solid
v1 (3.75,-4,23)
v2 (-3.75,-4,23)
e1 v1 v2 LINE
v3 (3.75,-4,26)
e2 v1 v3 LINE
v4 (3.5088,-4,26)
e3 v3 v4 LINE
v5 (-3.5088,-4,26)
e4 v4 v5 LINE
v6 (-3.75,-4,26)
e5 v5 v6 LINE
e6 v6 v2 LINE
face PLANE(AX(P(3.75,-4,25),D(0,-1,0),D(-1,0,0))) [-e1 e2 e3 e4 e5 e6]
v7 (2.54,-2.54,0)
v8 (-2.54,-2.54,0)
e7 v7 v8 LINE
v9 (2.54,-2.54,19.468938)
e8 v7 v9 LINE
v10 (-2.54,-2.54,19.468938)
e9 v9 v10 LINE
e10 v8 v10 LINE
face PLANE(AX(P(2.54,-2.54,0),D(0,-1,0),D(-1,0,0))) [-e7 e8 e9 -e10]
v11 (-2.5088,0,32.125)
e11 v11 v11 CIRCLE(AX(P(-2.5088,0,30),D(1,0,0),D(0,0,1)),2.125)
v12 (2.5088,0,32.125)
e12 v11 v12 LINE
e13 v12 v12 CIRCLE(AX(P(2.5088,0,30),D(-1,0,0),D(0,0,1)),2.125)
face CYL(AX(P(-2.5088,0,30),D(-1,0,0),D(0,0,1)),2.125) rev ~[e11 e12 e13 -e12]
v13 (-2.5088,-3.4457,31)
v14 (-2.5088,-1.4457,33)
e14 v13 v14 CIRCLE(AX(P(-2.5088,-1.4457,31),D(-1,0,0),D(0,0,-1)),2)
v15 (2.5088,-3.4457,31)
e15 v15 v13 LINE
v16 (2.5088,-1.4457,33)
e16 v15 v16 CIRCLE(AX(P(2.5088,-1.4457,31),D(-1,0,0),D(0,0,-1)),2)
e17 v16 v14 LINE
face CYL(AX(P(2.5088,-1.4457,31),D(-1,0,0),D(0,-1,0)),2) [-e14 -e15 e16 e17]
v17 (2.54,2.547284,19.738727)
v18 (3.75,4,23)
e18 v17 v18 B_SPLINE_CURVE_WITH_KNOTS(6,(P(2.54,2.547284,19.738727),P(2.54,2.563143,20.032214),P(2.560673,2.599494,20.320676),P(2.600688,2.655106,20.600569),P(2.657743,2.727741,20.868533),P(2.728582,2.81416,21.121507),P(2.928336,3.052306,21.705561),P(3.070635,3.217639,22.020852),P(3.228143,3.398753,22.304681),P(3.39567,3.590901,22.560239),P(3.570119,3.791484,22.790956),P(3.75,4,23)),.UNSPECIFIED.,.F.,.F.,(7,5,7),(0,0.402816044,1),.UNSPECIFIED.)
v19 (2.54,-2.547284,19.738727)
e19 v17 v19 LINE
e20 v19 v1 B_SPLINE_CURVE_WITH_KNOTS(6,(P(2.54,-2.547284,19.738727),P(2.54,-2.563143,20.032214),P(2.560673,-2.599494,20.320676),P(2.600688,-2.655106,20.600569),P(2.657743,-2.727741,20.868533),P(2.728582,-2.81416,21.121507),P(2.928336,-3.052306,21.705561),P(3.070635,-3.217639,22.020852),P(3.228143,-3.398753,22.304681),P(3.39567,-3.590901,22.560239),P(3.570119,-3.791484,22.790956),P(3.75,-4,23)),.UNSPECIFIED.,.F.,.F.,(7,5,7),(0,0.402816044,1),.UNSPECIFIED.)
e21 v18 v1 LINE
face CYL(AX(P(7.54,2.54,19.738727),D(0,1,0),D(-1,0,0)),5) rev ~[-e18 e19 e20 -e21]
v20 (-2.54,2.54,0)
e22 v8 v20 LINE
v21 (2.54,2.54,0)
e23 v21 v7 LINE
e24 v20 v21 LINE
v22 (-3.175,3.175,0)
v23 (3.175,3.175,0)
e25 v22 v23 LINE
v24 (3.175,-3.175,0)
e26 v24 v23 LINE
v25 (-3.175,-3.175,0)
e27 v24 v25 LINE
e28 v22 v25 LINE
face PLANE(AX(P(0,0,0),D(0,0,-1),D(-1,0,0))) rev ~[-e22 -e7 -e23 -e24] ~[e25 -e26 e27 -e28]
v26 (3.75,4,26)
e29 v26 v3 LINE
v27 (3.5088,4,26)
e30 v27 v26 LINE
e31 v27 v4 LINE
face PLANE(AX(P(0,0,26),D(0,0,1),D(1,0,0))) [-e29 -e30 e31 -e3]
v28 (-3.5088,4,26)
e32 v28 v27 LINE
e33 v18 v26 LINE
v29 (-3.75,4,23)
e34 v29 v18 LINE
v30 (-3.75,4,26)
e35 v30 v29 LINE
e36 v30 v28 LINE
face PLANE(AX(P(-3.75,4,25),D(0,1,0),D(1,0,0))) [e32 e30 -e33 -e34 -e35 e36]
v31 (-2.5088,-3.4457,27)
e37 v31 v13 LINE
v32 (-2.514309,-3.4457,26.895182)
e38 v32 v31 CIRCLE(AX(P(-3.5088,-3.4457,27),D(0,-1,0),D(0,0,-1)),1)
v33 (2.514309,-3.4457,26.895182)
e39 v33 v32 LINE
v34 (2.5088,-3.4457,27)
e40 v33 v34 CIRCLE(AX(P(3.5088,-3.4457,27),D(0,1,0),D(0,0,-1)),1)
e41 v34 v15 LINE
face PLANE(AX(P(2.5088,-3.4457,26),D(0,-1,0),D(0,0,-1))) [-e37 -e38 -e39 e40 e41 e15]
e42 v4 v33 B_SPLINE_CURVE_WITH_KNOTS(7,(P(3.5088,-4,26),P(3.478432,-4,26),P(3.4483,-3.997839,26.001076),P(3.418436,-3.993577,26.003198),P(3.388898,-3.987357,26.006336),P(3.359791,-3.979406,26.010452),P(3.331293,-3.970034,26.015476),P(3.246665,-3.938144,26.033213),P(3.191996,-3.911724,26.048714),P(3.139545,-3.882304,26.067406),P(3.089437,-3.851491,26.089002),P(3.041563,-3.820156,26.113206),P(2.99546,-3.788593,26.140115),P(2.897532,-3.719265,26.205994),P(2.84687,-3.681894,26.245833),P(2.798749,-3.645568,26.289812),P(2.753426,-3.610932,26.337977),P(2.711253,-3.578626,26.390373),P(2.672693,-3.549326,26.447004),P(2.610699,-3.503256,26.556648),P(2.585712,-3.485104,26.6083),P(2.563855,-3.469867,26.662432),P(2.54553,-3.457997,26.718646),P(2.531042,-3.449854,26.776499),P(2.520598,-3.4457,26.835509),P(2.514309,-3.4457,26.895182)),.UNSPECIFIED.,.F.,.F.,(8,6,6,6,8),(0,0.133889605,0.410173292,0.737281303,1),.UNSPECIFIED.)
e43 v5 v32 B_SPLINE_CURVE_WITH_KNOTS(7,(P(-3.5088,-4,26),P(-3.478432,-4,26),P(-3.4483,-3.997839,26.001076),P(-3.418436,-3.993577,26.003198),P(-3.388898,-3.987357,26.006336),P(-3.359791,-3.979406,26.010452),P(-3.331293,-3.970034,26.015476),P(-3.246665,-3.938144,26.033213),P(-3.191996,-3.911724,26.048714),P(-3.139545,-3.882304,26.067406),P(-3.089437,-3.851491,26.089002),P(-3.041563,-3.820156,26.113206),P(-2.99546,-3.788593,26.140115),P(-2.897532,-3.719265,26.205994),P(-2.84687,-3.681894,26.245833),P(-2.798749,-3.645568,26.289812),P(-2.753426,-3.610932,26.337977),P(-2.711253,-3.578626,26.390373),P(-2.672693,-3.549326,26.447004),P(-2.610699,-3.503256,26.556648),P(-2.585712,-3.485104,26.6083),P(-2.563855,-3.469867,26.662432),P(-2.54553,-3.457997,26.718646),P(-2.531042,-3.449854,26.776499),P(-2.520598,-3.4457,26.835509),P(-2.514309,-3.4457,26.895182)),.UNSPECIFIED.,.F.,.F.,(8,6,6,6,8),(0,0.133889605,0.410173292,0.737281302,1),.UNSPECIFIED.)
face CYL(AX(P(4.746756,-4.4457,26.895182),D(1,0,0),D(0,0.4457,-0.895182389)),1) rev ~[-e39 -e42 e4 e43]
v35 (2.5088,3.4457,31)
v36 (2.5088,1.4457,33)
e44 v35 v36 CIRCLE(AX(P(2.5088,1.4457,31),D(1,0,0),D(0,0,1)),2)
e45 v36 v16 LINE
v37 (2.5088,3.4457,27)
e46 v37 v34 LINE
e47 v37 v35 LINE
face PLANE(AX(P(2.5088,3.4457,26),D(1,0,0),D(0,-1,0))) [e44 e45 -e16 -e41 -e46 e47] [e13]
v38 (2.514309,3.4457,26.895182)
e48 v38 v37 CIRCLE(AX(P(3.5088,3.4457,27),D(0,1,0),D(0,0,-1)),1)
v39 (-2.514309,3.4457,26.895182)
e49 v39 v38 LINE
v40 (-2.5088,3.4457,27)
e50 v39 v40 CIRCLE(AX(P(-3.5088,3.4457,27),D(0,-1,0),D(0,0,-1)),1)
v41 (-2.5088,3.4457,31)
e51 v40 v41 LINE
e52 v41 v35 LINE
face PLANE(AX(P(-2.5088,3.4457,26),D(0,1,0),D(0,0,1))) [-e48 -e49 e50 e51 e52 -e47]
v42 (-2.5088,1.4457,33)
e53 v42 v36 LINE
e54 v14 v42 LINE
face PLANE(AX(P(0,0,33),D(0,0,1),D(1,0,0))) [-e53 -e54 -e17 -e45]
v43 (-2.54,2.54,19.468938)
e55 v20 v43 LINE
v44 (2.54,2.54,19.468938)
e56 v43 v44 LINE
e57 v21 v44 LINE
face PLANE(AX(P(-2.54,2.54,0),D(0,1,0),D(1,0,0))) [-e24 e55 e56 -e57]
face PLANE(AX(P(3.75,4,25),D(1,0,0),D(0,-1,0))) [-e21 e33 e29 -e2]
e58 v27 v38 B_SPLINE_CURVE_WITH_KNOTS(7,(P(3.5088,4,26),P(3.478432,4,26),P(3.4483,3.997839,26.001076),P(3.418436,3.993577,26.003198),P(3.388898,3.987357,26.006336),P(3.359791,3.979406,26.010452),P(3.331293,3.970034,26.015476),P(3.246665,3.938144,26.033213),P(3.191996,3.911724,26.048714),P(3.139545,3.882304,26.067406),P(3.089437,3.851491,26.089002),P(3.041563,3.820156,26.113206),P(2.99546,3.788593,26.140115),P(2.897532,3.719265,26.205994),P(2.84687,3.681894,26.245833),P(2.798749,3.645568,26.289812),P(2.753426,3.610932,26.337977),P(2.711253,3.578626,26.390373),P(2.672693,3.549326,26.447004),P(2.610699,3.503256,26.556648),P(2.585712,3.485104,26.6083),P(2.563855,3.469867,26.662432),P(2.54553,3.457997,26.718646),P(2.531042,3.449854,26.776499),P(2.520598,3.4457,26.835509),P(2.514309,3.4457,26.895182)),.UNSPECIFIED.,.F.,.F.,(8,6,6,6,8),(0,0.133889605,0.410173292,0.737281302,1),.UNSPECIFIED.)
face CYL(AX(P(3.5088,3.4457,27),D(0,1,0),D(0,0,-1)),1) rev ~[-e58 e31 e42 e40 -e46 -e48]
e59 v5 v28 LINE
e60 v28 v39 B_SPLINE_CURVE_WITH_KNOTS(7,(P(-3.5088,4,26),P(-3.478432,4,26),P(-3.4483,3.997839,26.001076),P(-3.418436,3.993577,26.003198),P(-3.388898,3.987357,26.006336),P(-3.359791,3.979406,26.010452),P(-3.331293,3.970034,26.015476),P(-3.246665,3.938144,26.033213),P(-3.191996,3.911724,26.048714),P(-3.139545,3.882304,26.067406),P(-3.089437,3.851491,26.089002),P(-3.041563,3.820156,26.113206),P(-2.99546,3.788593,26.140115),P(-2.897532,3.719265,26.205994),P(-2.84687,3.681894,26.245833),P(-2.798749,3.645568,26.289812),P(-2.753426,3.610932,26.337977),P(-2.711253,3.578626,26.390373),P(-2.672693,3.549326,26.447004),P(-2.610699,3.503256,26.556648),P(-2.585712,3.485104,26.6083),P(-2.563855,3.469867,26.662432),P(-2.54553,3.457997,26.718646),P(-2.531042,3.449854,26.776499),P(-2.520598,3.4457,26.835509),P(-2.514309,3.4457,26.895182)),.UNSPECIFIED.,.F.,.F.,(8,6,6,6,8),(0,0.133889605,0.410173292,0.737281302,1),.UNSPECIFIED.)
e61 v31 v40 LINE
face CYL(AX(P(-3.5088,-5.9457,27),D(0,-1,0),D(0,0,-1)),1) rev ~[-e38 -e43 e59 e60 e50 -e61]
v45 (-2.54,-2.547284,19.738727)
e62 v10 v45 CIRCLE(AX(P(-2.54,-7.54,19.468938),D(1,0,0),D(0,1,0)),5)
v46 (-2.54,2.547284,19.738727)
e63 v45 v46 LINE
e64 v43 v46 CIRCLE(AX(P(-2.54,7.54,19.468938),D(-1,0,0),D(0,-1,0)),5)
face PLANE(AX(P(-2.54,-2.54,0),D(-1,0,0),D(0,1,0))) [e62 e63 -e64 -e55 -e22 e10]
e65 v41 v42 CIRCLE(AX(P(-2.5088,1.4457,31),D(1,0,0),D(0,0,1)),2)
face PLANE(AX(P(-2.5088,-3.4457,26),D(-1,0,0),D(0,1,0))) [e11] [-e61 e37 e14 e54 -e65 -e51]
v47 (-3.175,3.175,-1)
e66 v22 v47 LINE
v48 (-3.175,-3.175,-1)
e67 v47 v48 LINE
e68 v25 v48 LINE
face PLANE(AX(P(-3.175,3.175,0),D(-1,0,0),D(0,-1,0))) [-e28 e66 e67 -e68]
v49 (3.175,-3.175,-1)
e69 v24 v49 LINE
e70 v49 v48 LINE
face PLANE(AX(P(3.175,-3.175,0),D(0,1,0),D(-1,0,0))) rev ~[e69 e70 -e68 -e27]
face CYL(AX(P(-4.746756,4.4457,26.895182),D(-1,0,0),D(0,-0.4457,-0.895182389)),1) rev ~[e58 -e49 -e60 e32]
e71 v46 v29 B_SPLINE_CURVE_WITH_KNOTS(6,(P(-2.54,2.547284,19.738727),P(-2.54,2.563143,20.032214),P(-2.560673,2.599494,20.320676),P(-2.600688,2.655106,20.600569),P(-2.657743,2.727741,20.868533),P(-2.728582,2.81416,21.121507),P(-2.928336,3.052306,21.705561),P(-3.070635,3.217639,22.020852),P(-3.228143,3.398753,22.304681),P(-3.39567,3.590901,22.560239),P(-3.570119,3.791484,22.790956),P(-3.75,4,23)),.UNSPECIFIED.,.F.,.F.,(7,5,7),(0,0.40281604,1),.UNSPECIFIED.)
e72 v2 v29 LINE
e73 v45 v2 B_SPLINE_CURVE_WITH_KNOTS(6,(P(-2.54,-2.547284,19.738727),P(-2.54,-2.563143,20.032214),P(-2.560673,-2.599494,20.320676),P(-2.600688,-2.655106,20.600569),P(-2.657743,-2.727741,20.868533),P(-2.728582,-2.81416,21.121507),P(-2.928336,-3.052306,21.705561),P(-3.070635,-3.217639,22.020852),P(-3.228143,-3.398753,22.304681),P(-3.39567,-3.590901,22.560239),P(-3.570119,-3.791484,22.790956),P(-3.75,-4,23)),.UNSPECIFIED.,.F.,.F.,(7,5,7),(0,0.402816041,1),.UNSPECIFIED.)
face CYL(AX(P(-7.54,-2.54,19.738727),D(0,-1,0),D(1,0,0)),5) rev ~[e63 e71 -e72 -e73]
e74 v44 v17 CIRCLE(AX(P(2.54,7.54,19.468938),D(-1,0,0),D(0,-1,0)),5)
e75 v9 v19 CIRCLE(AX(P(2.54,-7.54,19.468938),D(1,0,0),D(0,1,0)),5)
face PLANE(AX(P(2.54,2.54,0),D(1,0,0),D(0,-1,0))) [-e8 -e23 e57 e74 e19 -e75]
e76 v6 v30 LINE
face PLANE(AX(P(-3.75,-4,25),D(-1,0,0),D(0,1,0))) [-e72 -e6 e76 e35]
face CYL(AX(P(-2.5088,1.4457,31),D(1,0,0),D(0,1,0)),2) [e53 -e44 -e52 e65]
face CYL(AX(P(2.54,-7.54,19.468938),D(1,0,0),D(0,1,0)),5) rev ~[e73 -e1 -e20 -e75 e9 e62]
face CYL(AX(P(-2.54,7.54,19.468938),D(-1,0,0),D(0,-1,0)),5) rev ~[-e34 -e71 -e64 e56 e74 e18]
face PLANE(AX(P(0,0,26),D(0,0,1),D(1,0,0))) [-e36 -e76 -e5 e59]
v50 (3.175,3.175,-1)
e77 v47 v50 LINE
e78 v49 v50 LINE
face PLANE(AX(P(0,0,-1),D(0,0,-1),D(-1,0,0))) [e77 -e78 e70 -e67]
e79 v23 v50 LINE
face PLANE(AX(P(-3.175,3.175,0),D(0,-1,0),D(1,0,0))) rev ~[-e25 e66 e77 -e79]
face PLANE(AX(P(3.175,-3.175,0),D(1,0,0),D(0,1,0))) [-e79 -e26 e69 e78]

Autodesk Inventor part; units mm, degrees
ref_plane "YZ Plane" through (0, 0, 0) normal (1, 0, 0) x (0, 1, 0)
ref_plane "XZ Plane" through (0, 0, 0) normal (0, 1, 0) x (-1, 0, 0)
ref_plane "XY Plane" through (0, 0, 0) normal (0, 0, 1) x (1, 0, 0)
sketch "Sketch1" plane through (0, 0, 0) normal (0, 0, 1) x (1, 0, 0)
  line L0 (-3.175, -3.175) -> (-3.175, 3.175) projected
  line L1 (-3.175, 3.175) -> (3.175, 3.175) projected
  line L2 (3.175, 3.175) -> (3.175, -3.175) projected
  line L3 (3.175, -3.175) -> (-3.175, -3.175) projected
  line L4 (-5, -5) -> (5, -5) projected
  line L5 (5, -5) -> (5, 5) projected
  line L6 (5, 5) -> (-5, 5) projected
  line L7 (-5, 5) -> (-5, -5) projected
  line L8 (-4.1303, 4.1303) -> (4.1303, 4.1303) projected
  line L9 (4.1303, 4.1303) -> (4.1303, -4.1303) projected
  line L10 (-4.1303, -4.1303) -> (-4.1303, 4.1303) projected
  line L11 (4.1303, -4.1303) -> (-4.1303, -4.1303) projected
  line L12 (2.54, -2.54) -> (-2.54, -2.54)
  line L13 (-2.54, -2.54) -> (-2.54, 2.54)
  line L14 (-2.54, 2.54) -> (2.54, 2.54)
  line L15 (2.54, 2.54) -> (2.54, -2.54)
  line L16 (2.54, -2.54) -> (-2.54, 2.54) construction
  line L17 (-2.54, -2.54) -> (2.54, 2.54) construction
  point P0 (0, 0)
  dimension "d0" = 5.08
  dimension "d1" = 5.08
extrude "Extrusion1" add sketch "Sketch1" along normal blind 25 contours L12 L13 L14 L15
sketch "Sketch2" plane through (0, 0, 0) normal (0, 0, -1) x (-1, 0, 0)
  line L0 (-3.175, -3.175) -> (-3.175, 3.175) projected
  line L1 (3.175, 3.175) -> (3.175, -3.175) projected
  line L2 (-3.175, -3.175) -> (3.175, -3.175)
  line L3 (3.175, -3.175) -> (3.175, 3.175)
  line L4 (3.175, 3.175) -> (-3.175, 3.175)
  line L5 (-3.175, 3.175) -> (-3.175, -3.175)
  point P0 (0, 0)
extrude "Extrusion2" add sketch "Sketch2" along normal blind 1
sketch "Sketch3" plane through (0, 0, 25) normal (0, 0, 1) x (1, 0, 0)
  line L0 (3.75, -4) -> (-3.75, -4)
  line L1 (-3.75, -4) -> (-3.75, 4)
  line L2 (-3.75, 4) -> (3.75, 4)
  line L3 (3.75, 4) -> (3.75, -4)
  line L4 (3.75, -4) -> (-3.75, 4) construction
  line L5 (-3.75, -4) -> (3.75, 4) construction
  point P0 (0, 0)
  dimension "d6" = 7.5
  dimension "d7" = 8
extrude "Extrusion3" add sketch "Sketch3" along normal blind 1 and the other way blind 2
fillet "Fillet1" radius 5 4 edges at (0, 2.54, 23) (2.54, 0, 23) (-2.54, 0, 23) (0, -2.54, 23)
sketch "Sketch4" plane through (0, 0, 26) normal (0, 0, 1) x (1, 0, 0)
  line L0 (2.5088, -3.4457) -> (-2.5088, -3.4457)
  line L1 (-2.5088, -3.4457) -> (-2.5088, 3.4457)
  line L2 (-2.5088, 3.4457) -> (2.5088, 3.4457)
  line L3 (2.5088, 3.4457) -> (2.5088, -3.4457)
  line L4 (2.5088, -3.4457) -> (-2.5088, 3.4457) construction
  line L5 (-2.5088, -3.4457) -> (2.5088, 3.4457) construction
  point P0 (0, 0)
extrude "Extrusion4" add sketch "Sketch4" along normal blind 7
sketch "Sketch5" plane through (-2.5088, -3.4457, 26) normal (-1, 0, 0) x (0, 0, 1)
  line L0 (0, 6.8913) -> (7, 6.8913) projected
  line L1 (0, 0) -> (4, 0)
  line L2 (4, 0) -> (4, 6.8913)
  line L3 (4, 6.8913) -> (0, 6.8913)
  line L4 (0, 6.8913) -> (0, 0)
  circle A0 centre (4, 3.4457) radius 2.125
  point P0 (-26, 3.4457)
  dimension "d15" = 4
  dimension "d16" = 4.25
extrude "Extrusion5" cut sketch "Sketch5" against normal blind 7 contours A0 L2 | L2 A0
fillet "Fillet2" radius 1 4 edges at (-2.5088, 0, 26) (0, -3.4457, 26) (2.5088, 0, 26) (0, 3.4457, 26)
fillet "Fillet3" radius 2 2 edges at (0, -3.4457, 33) (0, 3.4457, 33)
properties part number "arm-seg2"
